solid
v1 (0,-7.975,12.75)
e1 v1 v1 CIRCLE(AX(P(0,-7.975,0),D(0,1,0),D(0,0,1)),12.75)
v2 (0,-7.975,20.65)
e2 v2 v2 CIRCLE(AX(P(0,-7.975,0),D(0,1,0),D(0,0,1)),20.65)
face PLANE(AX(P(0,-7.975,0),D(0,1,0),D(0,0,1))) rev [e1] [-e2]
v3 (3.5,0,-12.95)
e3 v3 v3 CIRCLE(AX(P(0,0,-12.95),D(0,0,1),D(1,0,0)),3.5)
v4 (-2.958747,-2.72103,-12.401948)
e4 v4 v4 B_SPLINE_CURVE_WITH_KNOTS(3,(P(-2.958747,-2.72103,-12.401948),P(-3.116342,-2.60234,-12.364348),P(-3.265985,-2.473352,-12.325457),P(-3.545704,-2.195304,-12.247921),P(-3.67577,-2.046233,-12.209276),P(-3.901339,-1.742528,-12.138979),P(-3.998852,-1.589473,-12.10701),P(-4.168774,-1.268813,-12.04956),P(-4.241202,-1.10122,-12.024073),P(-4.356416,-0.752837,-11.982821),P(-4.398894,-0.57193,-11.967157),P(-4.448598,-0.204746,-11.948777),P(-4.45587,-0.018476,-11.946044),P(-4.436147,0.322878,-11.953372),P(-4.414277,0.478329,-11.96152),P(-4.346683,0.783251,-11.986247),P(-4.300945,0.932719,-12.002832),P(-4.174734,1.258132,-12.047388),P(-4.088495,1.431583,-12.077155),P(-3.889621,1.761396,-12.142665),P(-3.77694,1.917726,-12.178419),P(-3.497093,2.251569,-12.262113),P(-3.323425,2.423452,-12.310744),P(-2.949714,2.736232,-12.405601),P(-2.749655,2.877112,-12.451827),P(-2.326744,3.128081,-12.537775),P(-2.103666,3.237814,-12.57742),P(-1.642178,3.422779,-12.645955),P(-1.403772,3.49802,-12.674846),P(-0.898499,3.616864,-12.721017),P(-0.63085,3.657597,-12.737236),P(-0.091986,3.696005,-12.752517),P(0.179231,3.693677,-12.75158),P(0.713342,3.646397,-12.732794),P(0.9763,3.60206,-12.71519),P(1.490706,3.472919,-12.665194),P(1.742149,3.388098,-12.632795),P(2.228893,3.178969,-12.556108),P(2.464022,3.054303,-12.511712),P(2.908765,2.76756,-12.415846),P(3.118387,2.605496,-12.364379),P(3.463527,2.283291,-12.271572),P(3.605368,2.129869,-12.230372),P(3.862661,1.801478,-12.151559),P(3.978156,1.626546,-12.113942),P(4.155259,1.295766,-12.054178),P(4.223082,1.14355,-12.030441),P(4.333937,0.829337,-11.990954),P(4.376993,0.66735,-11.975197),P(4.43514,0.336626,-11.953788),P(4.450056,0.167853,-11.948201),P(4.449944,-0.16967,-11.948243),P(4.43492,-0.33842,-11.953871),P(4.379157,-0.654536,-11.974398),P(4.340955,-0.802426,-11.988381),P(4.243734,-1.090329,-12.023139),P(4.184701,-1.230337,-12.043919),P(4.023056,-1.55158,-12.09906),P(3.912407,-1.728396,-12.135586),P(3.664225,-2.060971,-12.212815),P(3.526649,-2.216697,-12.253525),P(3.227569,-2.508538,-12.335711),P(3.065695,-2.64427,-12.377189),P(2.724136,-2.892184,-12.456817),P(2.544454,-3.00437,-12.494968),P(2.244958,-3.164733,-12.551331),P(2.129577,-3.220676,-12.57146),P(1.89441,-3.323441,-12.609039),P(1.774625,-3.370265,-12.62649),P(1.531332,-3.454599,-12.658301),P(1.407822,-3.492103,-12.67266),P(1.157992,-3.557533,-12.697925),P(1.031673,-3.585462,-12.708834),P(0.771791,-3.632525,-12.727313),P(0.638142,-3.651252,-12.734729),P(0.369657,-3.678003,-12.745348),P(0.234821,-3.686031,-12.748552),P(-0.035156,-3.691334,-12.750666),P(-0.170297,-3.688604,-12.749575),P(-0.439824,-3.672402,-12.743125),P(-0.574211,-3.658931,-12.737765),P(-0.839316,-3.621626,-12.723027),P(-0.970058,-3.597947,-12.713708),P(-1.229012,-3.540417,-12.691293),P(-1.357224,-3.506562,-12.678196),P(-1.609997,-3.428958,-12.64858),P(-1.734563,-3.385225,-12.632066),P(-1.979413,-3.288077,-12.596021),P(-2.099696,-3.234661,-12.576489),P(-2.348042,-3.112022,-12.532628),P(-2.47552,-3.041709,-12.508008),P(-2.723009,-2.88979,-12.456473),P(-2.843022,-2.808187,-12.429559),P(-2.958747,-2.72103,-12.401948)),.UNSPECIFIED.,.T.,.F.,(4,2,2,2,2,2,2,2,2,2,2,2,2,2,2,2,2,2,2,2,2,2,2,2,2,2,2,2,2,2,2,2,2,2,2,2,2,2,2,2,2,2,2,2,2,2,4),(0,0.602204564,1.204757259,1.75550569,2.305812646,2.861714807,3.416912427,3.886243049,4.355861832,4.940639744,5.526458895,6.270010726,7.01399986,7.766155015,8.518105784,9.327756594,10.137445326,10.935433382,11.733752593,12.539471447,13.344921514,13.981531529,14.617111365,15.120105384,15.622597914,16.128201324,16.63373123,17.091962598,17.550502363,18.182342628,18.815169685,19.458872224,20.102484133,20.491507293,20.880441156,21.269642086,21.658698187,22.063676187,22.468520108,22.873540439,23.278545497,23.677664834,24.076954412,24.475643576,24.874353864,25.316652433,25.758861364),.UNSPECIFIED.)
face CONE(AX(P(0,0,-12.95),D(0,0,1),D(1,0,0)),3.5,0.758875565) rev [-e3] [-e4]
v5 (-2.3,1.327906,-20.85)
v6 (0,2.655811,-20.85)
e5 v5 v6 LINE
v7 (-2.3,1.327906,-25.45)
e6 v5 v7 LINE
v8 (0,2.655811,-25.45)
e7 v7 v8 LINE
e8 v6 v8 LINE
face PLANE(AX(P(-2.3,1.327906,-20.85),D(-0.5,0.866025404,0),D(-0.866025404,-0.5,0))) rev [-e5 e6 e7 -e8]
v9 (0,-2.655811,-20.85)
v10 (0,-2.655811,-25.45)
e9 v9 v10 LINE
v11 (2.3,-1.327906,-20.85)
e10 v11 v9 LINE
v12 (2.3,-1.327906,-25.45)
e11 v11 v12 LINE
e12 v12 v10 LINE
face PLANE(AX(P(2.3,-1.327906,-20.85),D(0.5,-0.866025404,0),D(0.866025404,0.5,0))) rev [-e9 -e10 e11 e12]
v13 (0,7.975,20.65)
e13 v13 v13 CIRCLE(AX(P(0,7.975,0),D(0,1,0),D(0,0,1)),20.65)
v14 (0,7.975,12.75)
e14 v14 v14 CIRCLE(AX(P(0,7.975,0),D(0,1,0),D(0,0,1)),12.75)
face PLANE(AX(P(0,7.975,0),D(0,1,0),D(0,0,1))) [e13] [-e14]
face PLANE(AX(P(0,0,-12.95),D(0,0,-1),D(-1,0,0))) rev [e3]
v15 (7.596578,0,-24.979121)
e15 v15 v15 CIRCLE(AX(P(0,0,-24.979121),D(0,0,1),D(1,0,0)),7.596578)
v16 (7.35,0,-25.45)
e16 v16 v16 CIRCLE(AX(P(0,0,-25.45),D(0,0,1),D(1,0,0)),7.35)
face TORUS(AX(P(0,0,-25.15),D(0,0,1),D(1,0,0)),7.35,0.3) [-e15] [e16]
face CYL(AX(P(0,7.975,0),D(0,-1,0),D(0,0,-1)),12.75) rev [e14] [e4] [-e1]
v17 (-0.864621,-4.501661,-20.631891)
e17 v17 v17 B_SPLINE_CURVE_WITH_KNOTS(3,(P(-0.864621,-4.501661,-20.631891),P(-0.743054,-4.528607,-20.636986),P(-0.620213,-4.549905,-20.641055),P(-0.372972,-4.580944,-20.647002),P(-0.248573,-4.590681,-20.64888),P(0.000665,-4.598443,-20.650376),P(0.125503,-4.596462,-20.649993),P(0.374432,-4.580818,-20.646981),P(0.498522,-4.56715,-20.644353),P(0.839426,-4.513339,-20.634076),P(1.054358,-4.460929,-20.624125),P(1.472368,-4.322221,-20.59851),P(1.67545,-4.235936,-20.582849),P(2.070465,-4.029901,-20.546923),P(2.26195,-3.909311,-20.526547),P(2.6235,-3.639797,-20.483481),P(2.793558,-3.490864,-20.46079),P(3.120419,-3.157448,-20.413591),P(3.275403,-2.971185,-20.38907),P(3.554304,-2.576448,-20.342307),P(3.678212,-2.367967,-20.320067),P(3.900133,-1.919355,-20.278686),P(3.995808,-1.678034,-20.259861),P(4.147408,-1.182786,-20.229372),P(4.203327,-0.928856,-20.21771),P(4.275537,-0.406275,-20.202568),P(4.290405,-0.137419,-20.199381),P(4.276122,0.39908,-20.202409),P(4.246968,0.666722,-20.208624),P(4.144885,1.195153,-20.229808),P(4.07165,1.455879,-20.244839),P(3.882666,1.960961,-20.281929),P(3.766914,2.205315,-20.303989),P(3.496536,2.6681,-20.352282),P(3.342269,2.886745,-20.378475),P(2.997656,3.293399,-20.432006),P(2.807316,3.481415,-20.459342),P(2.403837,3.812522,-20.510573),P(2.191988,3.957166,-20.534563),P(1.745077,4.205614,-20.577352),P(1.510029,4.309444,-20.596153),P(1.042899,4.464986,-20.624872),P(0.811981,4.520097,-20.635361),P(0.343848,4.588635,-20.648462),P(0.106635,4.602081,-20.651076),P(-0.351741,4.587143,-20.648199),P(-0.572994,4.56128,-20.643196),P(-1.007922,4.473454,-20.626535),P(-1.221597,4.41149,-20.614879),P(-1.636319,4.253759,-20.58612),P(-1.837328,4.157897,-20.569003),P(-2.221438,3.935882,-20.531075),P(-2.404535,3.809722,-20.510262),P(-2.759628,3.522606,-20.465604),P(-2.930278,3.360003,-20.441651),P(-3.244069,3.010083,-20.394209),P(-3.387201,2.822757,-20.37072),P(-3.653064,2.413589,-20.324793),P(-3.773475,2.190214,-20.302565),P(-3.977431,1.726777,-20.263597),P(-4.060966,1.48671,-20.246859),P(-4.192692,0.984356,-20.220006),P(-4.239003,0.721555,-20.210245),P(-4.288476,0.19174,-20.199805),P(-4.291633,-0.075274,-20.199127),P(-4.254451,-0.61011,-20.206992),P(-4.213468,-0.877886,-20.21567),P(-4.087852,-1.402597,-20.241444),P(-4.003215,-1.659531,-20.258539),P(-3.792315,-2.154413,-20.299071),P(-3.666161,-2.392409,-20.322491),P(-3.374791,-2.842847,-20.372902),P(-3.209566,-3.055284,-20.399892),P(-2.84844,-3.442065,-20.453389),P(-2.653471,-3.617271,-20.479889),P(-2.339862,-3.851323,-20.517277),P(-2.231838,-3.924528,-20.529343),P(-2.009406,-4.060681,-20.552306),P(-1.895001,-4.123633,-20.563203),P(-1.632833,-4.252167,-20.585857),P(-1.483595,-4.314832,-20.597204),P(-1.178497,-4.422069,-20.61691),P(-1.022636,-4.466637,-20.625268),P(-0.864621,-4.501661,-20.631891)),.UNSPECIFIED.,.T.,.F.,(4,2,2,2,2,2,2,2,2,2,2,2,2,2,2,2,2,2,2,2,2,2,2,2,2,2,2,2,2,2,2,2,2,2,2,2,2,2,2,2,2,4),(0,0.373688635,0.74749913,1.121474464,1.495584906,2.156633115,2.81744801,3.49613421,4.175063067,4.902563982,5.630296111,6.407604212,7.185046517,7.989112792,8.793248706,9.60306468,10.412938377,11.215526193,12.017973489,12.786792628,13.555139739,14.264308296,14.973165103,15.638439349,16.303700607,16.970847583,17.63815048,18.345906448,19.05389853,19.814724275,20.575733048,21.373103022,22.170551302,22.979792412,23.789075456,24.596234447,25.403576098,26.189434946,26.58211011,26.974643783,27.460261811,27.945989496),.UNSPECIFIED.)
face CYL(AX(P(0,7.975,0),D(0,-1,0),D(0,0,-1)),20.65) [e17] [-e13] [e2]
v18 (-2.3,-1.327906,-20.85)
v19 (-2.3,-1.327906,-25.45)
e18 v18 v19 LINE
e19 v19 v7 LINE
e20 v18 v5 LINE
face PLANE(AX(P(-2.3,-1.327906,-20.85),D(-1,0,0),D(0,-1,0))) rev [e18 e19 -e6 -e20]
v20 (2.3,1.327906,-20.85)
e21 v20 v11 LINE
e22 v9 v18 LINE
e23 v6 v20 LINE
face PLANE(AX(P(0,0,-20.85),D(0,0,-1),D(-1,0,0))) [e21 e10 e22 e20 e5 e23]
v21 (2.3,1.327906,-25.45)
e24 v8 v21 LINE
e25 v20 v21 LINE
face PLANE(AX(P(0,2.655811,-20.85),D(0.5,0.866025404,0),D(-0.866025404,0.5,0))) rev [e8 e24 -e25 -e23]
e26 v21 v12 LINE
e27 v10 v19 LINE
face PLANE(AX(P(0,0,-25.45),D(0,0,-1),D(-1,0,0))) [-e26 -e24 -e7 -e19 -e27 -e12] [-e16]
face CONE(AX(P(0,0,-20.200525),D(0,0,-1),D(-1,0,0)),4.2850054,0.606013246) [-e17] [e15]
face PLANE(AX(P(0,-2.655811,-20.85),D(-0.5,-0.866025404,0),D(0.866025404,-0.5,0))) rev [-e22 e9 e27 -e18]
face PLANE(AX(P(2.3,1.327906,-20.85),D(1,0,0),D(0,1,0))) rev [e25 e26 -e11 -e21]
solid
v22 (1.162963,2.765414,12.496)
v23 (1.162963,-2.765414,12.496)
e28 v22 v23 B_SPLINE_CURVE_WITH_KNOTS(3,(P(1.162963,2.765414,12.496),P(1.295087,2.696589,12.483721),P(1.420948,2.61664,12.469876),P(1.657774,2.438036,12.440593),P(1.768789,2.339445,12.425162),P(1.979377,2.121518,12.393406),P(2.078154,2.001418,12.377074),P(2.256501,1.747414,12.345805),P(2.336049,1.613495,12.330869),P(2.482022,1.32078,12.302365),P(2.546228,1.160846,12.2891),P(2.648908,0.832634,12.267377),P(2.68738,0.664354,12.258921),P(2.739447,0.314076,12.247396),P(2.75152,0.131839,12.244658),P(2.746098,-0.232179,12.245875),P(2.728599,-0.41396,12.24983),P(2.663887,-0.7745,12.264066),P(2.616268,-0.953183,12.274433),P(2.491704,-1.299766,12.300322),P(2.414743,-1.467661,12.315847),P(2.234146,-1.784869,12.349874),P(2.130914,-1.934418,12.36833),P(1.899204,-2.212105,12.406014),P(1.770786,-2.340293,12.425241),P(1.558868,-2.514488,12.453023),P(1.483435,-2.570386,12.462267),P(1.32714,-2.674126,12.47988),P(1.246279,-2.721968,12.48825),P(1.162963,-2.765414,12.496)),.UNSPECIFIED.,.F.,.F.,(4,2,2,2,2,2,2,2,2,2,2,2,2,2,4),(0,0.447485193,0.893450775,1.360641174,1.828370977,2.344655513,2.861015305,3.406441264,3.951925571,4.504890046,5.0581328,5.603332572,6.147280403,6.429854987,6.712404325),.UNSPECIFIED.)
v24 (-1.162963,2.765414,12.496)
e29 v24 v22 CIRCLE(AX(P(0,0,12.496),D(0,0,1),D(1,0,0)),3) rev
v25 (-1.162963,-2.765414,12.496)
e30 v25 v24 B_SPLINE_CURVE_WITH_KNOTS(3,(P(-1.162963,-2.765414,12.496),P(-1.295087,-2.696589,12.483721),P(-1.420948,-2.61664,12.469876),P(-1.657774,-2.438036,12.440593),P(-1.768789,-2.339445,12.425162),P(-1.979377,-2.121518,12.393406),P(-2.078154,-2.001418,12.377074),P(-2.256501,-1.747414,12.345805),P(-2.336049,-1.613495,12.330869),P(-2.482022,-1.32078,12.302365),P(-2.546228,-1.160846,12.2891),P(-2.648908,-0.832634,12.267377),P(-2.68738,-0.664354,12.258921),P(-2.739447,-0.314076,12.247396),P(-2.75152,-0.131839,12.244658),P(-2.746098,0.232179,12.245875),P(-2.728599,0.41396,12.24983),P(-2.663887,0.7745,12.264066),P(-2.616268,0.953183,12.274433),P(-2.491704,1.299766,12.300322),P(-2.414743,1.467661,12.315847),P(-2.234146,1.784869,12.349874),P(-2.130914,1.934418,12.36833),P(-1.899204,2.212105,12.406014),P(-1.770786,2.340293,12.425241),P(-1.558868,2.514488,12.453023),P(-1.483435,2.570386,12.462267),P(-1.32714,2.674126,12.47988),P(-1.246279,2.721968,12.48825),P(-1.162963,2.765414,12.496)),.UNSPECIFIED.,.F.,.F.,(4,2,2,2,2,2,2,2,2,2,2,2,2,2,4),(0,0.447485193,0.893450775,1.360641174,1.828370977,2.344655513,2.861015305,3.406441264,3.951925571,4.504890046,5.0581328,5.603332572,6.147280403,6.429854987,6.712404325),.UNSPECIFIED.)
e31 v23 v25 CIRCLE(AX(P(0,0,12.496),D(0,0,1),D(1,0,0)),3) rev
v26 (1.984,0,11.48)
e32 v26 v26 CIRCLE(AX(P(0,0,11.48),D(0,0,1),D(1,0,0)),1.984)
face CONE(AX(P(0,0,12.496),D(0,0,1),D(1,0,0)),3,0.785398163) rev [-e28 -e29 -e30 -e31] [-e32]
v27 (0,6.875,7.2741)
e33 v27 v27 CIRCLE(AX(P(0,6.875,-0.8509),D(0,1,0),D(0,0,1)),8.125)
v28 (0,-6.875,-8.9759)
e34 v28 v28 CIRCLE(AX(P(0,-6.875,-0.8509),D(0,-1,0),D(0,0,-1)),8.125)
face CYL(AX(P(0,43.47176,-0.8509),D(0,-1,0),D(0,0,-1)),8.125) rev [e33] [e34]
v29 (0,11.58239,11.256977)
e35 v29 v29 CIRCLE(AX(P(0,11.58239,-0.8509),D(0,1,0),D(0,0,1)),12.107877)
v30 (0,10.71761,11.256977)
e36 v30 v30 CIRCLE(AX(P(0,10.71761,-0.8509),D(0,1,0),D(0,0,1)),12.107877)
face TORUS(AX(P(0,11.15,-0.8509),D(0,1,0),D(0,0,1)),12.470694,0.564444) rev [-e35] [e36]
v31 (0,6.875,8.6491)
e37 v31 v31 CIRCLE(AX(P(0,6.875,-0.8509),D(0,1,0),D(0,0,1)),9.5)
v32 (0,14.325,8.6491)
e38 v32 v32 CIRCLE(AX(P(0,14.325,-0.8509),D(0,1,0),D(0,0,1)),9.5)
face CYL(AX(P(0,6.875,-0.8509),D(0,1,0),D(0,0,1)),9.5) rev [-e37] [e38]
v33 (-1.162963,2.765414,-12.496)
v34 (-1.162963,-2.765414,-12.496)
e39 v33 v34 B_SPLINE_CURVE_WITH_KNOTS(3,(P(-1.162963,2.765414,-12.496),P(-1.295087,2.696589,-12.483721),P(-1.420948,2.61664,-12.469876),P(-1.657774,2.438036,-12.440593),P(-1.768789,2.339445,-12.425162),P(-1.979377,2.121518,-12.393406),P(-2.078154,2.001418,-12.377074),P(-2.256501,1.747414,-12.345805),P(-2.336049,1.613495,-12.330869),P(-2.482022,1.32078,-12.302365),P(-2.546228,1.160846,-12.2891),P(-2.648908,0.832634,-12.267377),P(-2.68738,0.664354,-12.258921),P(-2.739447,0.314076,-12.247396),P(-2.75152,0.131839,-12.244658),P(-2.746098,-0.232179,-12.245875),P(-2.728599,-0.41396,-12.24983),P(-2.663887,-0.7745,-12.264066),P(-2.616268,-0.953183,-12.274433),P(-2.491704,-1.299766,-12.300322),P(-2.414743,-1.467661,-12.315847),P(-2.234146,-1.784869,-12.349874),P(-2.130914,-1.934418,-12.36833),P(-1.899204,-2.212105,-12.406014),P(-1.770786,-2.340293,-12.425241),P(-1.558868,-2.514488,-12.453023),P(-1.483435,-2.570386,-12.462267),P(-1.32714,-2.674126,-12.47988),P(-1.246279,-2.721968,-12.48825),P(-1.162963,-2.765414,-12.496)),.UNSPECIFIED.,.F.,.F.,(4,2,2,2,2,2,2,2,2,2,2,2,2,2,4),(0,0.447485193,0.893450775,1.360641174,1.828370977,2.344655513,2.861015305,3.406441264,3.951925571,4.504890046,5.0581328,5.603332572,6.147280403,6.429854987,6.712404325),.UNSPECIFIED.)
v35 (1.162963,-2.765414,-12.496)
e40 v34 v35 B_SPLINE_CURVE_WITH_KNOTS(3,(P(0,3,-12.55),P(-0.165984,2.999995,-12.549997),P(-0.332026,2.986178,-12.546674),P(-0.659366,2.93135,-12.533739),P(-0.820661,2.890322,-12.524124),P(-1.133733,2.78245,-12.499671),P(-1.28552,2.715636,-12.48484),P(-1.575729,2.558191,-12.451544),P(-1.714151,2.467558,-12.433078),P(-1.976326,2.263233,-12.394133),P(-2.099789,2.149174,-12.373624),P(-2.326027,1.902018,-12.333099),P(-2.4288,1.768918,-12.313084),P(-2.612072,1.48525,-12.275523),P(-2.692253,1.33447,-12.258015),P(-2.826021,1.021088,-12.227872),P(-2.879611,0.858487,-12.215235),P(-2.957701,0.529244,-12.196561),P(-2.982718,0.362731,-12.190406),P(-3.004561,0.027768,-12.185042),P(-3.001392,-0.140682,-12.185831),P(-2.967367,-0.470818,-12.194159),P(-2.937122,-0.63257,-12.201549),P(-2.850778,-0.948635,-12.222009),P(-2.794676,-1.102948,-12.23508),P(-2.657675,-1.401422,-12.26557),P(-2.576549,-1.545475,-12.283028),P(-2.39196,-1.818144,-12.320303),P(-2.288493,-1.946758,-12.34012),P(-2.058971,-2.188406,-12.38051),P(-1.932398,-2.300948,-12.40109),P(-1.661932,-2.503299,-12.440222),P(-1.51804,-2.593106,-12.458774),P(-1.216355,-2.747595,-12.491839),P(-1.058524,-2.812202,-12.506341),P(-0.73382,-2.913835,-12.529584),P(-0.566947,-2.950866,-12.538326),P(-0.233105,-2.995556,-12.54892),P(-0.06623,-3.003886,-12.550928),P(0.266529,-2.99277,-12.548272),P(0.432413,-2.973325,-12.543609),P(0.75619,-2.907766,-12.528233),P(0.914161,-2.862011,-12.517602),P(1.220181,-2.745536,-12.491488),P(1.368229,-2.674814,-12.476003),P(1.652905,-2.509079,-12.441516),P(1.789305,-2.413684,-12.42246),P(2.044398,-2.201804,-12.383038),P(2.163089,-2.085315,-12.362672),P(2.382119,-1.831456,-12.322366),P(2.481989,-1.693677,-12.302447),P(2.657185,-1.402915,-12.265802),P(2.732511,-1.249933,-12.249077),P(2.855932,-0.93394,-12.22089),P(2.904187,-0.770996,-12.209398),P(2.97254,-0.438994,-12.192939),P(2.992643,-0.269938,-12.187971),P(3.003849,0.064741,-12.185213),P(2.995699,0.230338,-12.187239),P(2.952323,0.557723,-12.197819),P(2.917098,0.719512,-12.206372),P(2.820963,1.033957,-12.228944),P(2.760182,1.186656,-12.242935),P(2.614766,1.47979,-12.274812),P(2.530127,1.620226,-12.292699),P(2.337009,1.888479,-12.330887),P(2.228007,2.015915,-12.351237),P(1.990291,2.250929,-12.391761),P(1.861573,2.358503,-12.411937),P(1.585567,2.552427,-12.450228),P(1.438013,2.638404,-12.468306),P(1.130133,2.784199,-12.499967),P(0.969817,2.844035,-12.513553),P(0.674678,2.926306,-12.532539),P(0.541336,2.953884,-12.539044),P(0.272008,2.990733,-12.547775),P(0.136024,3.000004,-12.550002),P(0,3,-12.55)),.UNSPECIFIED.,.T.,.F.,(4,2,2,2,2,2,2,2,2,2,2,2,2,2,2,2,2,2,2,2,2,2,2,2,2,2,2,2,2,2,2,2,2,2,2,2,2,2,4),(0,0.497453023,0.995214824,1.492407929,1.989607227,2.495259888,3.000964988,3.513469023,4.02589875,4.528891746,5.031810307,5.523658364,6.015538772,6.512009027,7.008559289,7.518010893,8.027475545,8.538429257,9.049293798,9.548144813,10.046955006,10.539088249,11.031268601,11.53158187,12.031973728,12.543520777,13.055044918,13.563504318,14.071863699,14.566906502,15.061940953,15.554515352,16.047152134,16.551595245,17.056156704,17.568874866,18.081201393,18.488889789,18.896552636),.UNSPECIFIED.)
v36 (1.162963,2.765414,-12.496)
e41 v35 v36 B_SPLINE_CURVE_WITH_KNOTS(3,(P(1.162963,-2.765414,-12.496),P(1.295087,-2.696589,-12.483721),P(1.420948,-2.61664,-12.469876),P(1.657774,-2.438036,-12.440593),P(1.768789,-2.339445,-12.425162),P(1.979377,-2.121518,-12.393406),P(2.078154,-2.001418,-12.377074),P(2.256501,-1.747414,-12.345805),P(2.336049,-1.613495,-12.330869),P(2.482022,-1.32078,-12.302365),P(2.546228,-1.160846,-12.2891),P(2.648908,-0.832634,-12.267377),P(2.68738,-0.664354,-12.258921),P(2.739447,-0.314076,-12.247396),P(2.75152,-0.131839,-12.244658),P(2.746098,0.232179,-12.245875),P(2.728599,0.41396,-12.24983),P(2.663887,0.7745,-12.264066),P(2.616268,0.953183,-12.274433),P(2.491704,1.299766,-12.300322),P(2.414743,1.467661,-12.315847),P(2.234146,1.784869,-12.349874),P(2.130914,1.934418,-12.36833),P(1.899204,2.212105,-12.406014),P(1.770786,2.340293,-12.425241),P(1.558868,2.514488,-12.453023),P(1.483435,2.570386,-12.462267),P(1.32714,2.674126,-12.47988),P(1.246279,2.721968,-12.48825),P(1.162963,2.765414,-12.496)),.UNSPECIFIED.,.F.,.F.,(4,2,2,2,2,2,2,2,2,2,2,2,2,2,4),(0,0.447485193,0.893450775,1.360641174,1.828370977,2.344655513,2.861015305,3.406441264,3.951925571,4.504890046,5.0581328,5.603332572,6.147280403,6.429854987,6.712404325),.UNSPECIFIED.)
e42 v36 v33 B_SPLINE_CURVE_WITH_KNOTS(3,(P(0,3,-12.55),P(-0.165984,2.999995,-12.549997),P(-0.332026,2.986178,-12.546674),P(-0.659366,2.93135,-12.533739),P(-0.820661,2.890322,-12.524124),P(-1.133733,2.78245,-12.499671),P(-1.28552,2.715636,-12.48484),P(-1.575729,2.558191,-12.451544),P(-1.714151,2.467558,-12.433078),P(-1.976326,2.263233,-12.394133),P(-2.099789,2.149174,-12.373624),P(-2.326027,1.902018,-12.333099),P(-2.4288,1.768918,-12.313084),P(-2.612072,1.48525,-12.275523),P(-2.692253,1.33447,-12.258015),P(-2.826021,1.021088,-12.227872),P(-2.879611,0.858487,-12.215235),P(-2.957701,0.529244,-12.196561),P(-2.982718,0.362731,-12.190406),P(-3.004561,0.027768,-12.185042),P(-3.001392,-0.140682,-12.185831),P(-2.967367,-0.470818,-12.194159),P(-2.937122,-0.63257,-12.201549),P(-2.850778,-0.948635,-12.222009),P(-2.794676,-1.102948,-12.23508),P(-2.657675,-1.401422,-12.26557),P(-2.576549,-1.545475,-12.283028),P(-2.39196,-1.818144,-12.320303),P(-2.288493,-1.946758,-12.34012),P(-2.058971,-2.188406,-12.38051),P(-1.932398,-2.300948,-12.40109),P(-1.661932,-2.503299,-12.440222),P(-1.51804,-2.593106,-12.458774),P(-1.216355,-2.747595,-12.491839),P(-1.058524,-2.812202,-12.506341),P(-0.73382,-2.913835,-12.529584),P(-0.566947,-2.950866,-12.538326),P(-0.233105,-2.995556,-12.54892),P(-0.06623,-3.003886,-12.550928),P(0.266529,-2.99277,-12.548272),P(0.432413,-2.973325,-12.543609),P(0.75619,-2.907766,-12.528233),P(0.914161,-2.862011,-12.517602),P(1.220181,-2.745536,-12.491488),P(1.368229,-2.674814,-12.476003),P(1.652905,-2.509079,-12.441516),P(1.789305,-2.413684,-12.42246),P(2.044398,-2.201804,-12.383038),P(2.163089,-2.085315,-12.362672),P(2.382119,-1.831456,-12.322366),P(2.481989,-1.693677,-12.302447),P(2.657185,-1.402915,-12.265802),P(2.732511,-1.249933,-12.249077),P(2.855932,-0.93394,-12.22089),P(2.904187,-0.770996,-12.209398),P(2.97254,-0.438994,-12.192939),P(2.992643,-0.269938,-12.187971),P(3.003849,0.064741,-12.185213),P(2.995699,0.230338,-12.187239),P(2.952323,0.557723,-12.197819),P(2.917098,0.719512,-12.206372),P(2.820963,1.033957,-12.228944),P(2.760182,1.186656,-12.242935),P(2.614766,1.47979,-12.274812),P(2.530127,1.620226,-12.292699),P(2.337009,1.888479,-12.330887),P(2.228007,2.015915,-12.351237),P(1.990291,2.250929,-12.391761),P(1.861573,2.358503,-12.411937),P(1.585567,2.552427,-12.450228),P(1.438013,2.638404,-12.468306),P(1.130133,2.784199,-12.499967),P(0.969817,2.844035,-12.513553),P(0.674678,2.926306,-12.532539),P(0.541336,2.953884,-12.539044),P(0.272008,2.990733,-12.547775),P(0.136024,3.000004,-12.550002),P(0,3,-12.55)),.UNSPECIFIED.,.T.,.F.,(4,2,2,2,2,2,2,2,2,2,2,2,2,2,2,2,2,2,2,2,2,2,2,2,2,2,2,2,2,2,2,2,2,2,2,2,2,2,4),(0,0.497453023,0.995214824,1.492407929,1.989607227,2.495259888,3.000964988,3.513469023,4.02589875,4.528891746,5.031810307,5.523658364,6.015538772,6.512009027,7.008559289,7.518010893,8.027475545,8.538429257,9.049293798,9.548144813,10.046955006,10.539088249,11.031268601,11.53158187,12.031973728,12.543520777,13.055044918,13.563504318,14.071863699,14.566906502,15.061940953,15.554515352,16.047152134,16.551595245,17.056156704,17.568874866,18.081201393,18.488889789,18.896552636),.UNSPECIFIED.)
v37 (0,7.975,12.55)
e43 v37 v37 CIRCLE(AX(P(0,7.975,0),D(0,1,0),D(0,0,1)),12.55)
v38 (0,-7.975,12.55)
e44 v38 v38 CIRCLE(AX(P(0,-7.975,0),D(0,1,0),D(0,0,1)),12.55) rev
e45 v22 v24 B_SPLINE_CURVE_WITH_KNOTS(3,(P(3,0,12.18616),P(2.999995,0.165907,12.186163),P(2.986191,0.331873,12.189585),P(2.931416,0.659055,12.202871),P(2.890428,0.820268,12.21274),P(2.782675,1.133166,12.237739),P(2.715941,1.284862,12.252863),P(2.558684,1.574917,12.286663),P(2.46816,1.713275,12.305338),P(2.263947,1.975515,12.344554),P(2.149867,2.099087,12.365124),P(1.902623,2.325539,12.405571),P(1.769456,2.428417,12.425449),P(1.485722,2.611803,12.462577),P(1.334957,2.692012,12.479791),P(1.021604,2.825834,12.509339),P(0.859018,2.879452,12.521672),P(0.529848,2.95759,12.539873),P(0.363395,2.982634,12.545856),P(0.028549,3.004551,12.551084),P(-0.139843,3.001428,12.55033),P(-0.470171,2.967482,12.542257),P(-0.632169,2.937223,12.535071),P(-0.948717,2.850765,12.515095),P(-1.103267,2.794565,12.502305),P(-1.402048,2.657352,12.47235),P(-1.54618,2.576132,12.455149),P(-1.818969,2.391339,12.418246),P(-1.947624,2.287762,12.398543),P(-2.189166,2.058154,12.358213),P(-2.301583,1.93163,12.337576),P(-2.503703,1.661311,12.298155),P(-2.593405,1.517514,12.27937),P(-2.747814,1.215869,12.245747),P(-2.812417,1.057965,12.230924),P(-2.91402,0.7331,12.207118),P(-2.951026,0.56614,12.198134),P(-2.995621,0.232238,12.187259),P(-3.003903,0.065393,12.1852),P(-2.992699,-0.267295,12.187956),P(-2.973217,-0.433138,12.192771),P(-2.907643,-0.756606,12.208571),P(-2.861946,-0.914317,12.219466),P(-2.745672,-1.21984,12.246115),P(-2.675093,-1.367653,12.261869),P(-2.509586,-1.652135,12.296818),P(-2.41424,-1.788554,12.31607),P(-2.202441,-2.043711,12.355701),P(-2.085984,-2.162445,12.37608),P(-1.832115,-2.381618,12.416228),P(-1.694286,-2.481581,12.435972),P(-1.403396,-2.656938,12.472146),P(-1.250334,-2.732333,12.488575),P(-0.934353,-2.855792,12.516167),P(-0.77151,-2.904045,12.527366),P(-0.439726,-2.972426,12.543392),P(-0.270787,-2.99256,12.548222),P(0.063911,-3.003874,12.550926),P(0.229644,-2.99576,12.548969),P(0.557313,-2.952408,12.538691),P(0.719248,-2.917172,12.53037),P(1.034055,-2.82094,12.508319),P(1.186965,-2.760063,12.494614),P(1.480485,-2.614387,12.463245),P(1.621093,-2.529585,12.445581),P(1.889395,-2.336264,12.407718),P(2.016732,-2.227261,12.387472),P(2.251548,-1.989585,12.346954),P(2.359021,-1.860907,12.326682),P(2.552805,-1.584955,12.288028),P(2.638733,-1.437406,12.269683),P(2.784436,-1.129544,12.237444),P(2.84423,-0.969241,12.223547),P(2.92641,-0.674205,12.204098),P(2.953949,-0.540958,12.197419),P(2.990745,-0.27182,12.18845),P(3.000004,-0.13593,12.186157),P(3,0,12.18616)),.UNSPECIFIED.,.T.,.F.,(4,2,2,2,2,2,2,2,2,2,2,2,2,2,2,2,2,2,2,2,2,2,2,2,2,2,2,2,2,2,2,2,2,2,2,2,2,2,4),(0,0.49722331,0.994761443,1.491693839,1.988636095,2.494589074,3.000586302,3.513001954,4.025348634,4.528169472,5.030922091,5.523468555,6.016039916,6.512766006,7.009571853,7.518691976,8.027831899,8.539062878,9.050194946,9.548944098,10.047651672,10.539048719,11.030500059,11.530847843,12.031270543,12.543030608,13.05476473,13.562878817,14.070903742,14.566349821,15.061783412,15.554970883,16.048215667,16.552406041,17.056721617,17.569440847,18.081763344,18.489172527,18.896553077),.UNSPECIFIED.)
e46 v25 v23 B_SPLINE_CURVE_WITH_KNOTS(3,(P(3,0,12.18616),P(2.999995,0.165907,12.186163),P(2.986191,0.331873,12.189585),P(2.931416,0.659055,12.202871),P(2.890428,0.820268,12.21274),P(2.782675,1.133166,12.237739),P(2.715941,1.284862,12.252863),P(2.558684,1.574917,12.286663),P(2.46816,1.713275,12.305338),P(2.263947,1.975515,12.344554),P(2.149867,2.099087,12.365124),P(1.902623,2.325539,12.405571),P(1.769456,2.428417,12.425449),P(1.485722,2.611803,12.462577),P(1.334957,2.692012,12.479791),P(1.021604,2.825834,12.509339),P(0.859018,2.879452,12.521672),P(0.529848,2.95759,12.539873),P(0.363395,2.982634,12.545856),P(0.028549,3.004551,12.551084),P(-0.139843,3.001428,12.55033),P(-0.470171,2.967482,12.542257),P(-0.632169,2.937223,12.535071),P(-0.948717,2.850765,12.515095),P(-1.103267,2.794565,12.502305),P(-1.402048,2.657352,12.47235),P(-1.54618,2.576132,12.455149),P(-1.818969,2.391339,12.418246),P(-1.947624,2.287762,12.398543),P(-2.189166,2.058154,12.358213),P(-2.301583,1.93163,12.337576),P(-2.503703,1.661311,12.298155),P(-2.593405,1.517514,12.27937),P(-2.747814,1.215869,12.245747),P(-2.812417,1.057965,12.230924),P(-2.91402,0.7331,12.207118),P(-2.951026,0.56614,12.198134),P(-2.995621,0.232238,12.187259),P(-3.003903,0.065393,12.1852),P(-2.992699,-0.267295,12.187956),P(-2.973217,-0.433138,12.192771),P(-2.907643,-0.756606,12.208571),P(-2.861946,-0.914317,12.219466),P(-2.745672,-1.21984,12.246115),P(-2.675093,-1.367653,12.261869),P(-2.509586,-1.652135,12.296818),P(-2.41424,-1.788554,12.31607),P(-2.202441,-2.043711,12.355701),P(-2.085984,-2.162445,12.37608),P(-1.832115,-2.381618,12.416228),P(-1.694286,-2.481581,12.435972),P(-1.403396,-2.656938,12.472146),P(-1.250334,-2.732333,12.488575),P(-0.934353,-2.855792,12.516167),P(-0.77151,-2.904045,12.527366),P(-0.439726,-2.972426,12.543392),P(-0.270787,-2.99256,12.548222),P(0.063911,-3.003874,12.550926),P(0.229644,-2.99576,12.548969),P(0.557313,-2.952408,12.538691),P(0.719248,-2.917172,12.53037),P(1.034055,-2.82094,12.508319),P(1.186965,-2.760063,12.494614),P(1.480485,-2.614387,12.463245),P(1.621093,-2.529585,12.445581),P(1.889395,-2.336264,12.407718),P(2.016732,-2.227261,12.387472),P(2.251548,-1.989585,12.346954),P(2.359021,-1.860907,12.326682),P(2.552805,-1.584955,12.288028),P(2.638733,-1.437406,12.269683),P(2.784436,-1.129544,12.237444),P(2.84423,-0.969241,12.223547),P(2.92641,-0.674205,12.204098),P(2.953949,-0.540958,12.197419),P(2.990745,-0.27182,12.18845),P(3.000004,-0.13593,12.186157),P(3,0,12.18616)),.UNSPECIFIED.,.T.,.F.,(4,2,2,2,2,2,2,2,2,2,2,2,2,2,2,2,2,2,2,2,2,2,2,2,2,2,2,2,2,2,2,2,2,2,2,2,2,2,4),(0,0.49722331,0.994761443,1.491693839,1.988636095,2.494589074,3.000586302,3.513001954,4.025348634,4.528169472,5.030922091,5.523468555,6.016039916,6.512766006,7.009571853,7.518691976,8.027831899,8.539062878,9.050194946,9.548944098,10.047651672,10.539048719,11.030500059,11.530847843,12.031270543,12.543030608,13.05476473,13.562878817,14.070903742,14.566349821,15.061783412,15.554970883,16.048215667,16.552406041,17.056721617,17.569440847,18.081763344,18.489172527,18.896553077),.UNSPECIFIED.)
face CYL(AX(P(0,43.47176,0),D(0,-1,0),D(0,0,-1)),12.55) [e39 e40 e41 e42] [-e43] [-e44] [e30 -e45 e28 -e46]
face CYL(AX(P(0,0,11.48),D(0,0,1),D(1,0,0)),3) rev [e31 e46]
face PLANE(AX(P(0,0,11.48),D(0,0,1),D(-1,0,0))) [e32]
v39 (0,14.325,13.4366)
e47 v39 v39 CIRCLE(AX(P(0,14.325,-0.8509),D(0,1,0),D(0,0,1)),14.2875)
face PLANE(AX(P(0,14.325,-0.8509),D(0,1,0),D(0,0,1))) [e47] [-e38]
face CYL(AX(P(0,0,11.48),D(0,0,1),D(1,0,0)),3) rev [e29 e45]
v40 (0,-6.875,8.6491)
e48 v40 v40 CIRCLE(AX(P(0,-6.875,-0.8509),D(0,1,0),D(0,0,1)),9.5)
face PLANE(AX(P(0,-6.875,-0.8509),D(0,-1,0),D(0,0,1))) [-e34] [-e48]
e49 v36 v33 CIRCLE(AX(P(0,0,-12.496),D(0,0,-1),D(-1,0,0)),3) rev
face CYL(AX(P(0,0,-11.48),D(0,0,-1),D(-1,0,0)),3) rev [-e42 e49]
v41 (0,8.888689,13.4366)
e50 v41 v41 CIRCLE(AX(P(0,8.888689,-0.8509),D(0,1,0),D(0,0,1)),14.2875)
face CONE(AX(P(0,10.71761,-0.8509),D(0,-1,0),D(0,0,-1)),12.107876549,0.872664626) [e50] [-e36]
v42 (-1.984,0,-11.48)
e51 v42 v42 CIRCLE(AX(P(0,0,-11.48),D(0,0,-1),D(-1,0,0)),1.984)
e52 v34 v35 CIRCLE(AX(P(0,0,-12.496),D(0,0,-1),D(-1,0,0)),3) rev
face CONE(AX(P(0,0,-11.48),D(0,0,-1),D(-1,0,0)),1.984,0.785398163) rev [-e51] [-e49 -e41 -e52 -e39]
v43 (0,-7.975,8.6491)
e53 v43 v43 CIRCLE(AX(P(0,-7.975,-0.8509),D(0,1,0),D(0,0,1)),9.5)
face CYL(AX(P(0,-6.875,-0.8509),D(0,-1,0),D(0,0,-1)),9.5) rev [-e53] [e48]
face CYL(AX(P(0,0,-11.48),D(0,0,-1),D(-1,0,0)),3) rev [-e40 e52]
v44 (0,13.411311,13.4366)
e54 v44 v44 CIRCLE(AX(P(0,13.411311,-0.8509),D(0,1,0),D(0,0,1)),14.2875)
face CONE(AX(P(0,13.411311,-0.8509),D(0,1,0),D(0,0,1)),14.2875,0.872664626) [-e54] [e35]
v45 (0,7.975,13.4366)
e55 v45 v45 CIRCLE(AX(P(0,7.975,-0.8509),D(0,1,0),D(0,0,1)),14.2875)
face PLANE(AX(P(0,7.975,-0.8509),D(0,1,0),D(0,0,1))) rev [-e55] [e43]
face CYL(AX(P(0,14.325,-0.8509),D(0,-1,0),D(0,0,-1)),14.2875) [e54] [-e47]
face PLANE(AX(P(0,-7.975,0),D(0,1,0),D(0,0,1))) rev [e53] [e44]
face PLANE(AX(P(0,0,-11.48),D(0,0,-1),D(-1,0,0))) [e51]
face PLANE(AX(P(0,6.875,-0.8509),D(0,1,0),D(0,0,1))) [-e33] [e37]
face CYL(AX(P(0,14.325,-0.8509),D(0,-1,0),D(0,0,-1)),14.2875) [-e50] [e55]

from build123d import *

# Parameters (mm, degrees)
SKETCH1_R                       = 20.65
SKETCH1_R_2                     = 12.75
BOSS_EXTRUDE1_DEPTH             = 7.975
CUT_EXTRUDE1_DEPTH              = 4.6
BOSS_EXTRUDE2_REACH             = 35.73
SKETCH5_R                       = 12.55
SKETCH5_R_2                     = 8.125
BOSS_EXTRUDE2_DIRECTION_2_REACH = 35.73
SKETCH6_R                       = 9.5
CUT_EXTRUDE2_DEPTH              = 1.1
SKETCH7_R                       = 14.2875
SKETCH7_R_2                     = 9.5
BOSS_EXTRUDE4_DEPTH             = 6.35
SKETCH9_R                       = 3
CUT_EXTRUDE3_DEPTH              = 13.97
CHAMFER1_SIZE                   = 1.016
CHAMFER1_OF_MIRROR2_SIZE        = 1.016


with BuildPart() as part:
    # Sketch1 → Boss-Extrude1 (new, symmetric)
    with BuildSketch(Plane(origin=(0, 0, 0), x_dir=(1, 0, 0), z_dir=(0, 1, 0))):
        with Locations(Location((0, 0, 0), (0, 0, 270))):
            Circle(SKETCH1_R)
        with Locations(Location((0, 0, 0), (0, 0, 270))):
            Circle(SKETCH1_R_2, mode=Mode.SUBTRACT)
    extrude(amount=BOSS_EXTRUDE1_DEPTH, both=True)

    # Sketch2 → Revolve1 (revolve)
    with BuildSketch(Plane(origin=(0, 0, 0), x_dir=(1, 0, 0), z_dir=(0, 1, 0)), mode=Mode.PRIVATE) as revolve1_sk:
        with BuildLine():
            Line((0, 25.45), (-7.35, 25.45))
            ThreePointArc((-7.35, 25.45), (-7.615766407, 25.289169741), (-7.596577614, 24.979121446))
            Line((-7.596577614, 24.979121446), (-4.2850054, 20.200525457))
            Line((-4.2850054, 20.200525457), (0, 20.200525457))
            Line((0, 20.200525457), (0, 25.45))
        make_face()
    revolve(revolve1_sk.sketch.rotate(Axis((0, 0, 23), (0, 0, -1)), 280.872235791), axis=Axis((0, 0, 23), (0, 0, -1)))

    # Sketch3 → Cut-Extrude1 (cut)
    with BuildSketch(Plane(origin=(0, 0, -25.45), x_dir=(-1, 0, 0), z_dir=(0, 0, -1))):
        Polygon((0, 2.655811238), (-2.3, 1.327905619), (-2.3, -1.327905619), (0, -2.655811238), (2.3, -1.327905619), (2.3, 1.327905619), align=None)
    extrude(amount=-CUT_EXTRUDE1_DEPTH, mode=Mode.SUBTRACT)

    # Sketch4 → Cut-Revolve2 (revolve, cut)
    with BuildSketch(Plane(origin=(0, 0, 0), x_dir=(1, 0, 0), z_dir=(0, 1, 0)), mode=Mode.PRIVATE) as cut_revolve2_sk:
        Polygon((0, 12.95), (-3.5, 12.95), (-4.45, 11.948221625), (0, 11.948221625), align=None)
    revolve(cut_revolve2_sk.sketch.rotate(Axis((0, 0, 23), (0, 0, -1)), 180), axis=Axis((0, 0, 23), (0, 0, -1)), mode=Mode.SUBTRACT)


with BuildPart() as body_2:

    # Boss-Extrude2: up to this face of the body (flat: up to its plane)
    boss_extrude2_end = Plane(part.part.faces().sort_by_distance((0, 7.975, -20.065929799))[0])
    # Sketch5 → Boss-Extrude2 (new, up to the picked face)
    with BuildSketch(Plane(origin=(0, 0, 0), x_dir=(1, 0, 0), z_dir=(0, 1, 0)), mode=Mode.PRIVATE) as boss_extrude2_sk1:
        with Locations(Location((0, 0, 0), (0, 0, 270))):
            Circle(SKETCH5_R)
        with Locations(Location((0, 0.8509, 0), (0, 0, 270))):
            Circle(SKETCH5_R_2, mode=Mode.SUBTRACT)
    boss_extrude2_tool1 = split(extrude(boss_extrude2_sk1.sketch, amount=BOSS_EXTRUDE2_REACH, mode=Mode.PRIVATE), bisect_by=boss_extrude2_end, keep=Keep.BOTH, mode=Mode.PRIVATE)
    add(boss_extrude2_tool1.solids().sort_by(Axis((0, 0, -12.195032), (0, 1, 0)))[0])


    # Boss-Extrude2 direction 2: up to this face of the body (flat: up to its plane)
    boss_extrude2_direction_2_end = Plane(part.part.faces().sort_by_distance((0, -7.975, -20.065929799))[0])
    # Sketch5 → Boss-Extrude2 direction 2 (add, up to the picked face)
    with BuildSketch(Plane(origin=(0, 0, 0), x_dir=(1, 0, 0), z_dir=(0, 1, 0)), mode=Mode.PRIVATE) as boss_extrude2_direction_2_sk1:
        with Locations(Location((0, 0, 0), (0, 0, 270))):
            Circle(SKETCH5_R)
        with Locations(Location((0, 0.8509, 0), (0, 0, 270))):
            Circle(SKETCH5_R_2, mode=Mode.SUBTRACT)
    boss_extrude2_direction_2_tool1 = split(extrude(boss_extrude2_direction_2_sk1.sketch, amount=-BOSS_EXTRUDE2_DIRECTION_2_REACH, mode=Mode.PRIVATE), bisect_by=boss_extrude2_direction_2_end, keep=Keep.BOTH, mode=Mode.PRIVATE)
    add(boss_extrude2_direction_2_tool1.solids().sort_by(Axis((0, 0, -12.195032), (0, -1, 0)))[0])

    # Sketch6 → Cut-Extrude2 (cut)
    with BuildSketch(Plane(origin=(0, 7.975, 0), x_dir=(1, 0, 0), z_dir=(0, 1, 0))):
        with Locations(Location((0, 0.8509, 0), (0, 0, 270))):
            Circle(SKETCH6_R)
    cut_extrude2 = extrude(amount=-CUT_EXTRUDE2_DEPTH, mode=Mode.SUBTRACT)

    # Mirror1: Cut-Extrude2 across plane
    add(cut_extrude2.mirror(Plane.ZX), mode=Mode.SUBTRACT)

    # Sketch7 → Boss-Extrude4 (add)
    with BuildSketch(Plane(origin=(0, 7.975, 0), x_dir=(1, 0, 0), z_dir=(0, 1, 0))):
        with Locations(Location((0, 0.8509, 0), (0, 0, 270))):
            Circle(SKETCH7_R)
        with Locations(Location((0, 0.8509, 0), (0, 0, 270))):
            Circle(SKETCH7_R_2, mode=Mode.SUBTRACT)
    extrude(amount=BOSS_EXTRUDE4_DEPTH)

    # Sketch8 → Cut-Revolve3 (revolve, cut)
    with BuildSketch(Plane(origin=(0, 0, 0), x_dir=(0, 0, -1), z_dir=(1, 0, 0)), mode=Mode.PRIVATE) as cut_revolve3_sk:
        with BuildLine():
            Line((15.1384, 13.411310764), (12.958776549, 11.58238953))
            ThreePointArc((12.958776549, 11.58238953), (12.75715, 11.15), (12.958776549, 10.71761047))
            Line((12.958776549, 10.71761047), (15.1384, 8.888689236))
            Line((15.1384, 8.888689236), (15.1384, 13.411310764))
        make_face()
    revolve(cut_revolve3_sk.sketch.rotate(Axis((0, 38.651123455, -0.8509), (0, -1, 0)), 180), axis=Axis((0, 38.651123455, -0.8509), (0, -1, 0)), mode=Mode.SUBTRACT)

    # Sketch9 → Cut-Extrude3 (cut)
    with BuildSketch(Plane(origin=(0, 0, -25.45), x_dir=(-1, 0, 0), z_dir=(0, 0, -1))):
        Circle(SKETCH9_R)
    cut_extrude3 = extrude(amount=-CUT_EXTRUDE3_DEPTH, mode=Mode.SUBTRACT)

    # Chamfer1
    # the kernel refuses this chamfer: 1.016 mm, written as the material it adds along each edge
    with BuildSketch(Plane(origin=(0, 0, -11.48), x_dir=(-1, 0, 0), z_dir=(0, -1, 0))) as chamfer1_piece_1_section:
        Polygon((3, CHAMFER1_SIZE), (3 - CHAMFER1_SIZE, 0), (3, 0), align=None)
    chamfer1_piece_1 = revolve(axis=Axis((0, 0, -11.48), (0, 0, -1)), mode=Mode.PRIVATE)
    chamfer1_piece_1 = chamfer1_piece_1 & Plane(origin=(0, 0, 0), x_dir=(0, 0, 1), z_dir=(0, -1, 0)) * Cylinder(12.55, 12, mode=Mode.PRIVATE)
    add(chamfer1_piece_1)

    # Mirror2: Cut-Extrude3 across plane
    add(cut_extrude3.mirror(Plane.XY), mode=Mode.SUBTRACT)

    # Chamfer1 of Mirror2
    # the kernel refuses this chamfer: 1.016 mm, written as the material it adds along each edge
    with BuildSketch(Plane(origin=(0, 0, 11.48), x_dir=(-1, 0, 0), z_dir=(0, -1, 0))) as chamfer1_of_mirror2_piece_1_section:
        Polygon((3, -CHAMFER1_OF_MIRROR2_SIZE), (3 - CHAMFER1_OF_MIRROR2_SIZE, 0), (3, 0), align=None)
    chamfer1_of_mirror2_piece_1 = revolve(axis=Axis((0, 0, 11.48), (0, 0, -1)), mode=Mode.PRIVATE)
    chamfer1_of_mirror2_piece_1 = chamfer1_of_mirror2_piece_1 & Plane(origin=(0, 0, 0), x_dir=(0, 0, 1), z_dir=(0, -1, 0)) * Cylinder(12.55, 12, mode=Mode.PRIVATE)
    add(chamfer1_of_mirror2_piece_1)


solid = Compound([part.part, body_2.part])
